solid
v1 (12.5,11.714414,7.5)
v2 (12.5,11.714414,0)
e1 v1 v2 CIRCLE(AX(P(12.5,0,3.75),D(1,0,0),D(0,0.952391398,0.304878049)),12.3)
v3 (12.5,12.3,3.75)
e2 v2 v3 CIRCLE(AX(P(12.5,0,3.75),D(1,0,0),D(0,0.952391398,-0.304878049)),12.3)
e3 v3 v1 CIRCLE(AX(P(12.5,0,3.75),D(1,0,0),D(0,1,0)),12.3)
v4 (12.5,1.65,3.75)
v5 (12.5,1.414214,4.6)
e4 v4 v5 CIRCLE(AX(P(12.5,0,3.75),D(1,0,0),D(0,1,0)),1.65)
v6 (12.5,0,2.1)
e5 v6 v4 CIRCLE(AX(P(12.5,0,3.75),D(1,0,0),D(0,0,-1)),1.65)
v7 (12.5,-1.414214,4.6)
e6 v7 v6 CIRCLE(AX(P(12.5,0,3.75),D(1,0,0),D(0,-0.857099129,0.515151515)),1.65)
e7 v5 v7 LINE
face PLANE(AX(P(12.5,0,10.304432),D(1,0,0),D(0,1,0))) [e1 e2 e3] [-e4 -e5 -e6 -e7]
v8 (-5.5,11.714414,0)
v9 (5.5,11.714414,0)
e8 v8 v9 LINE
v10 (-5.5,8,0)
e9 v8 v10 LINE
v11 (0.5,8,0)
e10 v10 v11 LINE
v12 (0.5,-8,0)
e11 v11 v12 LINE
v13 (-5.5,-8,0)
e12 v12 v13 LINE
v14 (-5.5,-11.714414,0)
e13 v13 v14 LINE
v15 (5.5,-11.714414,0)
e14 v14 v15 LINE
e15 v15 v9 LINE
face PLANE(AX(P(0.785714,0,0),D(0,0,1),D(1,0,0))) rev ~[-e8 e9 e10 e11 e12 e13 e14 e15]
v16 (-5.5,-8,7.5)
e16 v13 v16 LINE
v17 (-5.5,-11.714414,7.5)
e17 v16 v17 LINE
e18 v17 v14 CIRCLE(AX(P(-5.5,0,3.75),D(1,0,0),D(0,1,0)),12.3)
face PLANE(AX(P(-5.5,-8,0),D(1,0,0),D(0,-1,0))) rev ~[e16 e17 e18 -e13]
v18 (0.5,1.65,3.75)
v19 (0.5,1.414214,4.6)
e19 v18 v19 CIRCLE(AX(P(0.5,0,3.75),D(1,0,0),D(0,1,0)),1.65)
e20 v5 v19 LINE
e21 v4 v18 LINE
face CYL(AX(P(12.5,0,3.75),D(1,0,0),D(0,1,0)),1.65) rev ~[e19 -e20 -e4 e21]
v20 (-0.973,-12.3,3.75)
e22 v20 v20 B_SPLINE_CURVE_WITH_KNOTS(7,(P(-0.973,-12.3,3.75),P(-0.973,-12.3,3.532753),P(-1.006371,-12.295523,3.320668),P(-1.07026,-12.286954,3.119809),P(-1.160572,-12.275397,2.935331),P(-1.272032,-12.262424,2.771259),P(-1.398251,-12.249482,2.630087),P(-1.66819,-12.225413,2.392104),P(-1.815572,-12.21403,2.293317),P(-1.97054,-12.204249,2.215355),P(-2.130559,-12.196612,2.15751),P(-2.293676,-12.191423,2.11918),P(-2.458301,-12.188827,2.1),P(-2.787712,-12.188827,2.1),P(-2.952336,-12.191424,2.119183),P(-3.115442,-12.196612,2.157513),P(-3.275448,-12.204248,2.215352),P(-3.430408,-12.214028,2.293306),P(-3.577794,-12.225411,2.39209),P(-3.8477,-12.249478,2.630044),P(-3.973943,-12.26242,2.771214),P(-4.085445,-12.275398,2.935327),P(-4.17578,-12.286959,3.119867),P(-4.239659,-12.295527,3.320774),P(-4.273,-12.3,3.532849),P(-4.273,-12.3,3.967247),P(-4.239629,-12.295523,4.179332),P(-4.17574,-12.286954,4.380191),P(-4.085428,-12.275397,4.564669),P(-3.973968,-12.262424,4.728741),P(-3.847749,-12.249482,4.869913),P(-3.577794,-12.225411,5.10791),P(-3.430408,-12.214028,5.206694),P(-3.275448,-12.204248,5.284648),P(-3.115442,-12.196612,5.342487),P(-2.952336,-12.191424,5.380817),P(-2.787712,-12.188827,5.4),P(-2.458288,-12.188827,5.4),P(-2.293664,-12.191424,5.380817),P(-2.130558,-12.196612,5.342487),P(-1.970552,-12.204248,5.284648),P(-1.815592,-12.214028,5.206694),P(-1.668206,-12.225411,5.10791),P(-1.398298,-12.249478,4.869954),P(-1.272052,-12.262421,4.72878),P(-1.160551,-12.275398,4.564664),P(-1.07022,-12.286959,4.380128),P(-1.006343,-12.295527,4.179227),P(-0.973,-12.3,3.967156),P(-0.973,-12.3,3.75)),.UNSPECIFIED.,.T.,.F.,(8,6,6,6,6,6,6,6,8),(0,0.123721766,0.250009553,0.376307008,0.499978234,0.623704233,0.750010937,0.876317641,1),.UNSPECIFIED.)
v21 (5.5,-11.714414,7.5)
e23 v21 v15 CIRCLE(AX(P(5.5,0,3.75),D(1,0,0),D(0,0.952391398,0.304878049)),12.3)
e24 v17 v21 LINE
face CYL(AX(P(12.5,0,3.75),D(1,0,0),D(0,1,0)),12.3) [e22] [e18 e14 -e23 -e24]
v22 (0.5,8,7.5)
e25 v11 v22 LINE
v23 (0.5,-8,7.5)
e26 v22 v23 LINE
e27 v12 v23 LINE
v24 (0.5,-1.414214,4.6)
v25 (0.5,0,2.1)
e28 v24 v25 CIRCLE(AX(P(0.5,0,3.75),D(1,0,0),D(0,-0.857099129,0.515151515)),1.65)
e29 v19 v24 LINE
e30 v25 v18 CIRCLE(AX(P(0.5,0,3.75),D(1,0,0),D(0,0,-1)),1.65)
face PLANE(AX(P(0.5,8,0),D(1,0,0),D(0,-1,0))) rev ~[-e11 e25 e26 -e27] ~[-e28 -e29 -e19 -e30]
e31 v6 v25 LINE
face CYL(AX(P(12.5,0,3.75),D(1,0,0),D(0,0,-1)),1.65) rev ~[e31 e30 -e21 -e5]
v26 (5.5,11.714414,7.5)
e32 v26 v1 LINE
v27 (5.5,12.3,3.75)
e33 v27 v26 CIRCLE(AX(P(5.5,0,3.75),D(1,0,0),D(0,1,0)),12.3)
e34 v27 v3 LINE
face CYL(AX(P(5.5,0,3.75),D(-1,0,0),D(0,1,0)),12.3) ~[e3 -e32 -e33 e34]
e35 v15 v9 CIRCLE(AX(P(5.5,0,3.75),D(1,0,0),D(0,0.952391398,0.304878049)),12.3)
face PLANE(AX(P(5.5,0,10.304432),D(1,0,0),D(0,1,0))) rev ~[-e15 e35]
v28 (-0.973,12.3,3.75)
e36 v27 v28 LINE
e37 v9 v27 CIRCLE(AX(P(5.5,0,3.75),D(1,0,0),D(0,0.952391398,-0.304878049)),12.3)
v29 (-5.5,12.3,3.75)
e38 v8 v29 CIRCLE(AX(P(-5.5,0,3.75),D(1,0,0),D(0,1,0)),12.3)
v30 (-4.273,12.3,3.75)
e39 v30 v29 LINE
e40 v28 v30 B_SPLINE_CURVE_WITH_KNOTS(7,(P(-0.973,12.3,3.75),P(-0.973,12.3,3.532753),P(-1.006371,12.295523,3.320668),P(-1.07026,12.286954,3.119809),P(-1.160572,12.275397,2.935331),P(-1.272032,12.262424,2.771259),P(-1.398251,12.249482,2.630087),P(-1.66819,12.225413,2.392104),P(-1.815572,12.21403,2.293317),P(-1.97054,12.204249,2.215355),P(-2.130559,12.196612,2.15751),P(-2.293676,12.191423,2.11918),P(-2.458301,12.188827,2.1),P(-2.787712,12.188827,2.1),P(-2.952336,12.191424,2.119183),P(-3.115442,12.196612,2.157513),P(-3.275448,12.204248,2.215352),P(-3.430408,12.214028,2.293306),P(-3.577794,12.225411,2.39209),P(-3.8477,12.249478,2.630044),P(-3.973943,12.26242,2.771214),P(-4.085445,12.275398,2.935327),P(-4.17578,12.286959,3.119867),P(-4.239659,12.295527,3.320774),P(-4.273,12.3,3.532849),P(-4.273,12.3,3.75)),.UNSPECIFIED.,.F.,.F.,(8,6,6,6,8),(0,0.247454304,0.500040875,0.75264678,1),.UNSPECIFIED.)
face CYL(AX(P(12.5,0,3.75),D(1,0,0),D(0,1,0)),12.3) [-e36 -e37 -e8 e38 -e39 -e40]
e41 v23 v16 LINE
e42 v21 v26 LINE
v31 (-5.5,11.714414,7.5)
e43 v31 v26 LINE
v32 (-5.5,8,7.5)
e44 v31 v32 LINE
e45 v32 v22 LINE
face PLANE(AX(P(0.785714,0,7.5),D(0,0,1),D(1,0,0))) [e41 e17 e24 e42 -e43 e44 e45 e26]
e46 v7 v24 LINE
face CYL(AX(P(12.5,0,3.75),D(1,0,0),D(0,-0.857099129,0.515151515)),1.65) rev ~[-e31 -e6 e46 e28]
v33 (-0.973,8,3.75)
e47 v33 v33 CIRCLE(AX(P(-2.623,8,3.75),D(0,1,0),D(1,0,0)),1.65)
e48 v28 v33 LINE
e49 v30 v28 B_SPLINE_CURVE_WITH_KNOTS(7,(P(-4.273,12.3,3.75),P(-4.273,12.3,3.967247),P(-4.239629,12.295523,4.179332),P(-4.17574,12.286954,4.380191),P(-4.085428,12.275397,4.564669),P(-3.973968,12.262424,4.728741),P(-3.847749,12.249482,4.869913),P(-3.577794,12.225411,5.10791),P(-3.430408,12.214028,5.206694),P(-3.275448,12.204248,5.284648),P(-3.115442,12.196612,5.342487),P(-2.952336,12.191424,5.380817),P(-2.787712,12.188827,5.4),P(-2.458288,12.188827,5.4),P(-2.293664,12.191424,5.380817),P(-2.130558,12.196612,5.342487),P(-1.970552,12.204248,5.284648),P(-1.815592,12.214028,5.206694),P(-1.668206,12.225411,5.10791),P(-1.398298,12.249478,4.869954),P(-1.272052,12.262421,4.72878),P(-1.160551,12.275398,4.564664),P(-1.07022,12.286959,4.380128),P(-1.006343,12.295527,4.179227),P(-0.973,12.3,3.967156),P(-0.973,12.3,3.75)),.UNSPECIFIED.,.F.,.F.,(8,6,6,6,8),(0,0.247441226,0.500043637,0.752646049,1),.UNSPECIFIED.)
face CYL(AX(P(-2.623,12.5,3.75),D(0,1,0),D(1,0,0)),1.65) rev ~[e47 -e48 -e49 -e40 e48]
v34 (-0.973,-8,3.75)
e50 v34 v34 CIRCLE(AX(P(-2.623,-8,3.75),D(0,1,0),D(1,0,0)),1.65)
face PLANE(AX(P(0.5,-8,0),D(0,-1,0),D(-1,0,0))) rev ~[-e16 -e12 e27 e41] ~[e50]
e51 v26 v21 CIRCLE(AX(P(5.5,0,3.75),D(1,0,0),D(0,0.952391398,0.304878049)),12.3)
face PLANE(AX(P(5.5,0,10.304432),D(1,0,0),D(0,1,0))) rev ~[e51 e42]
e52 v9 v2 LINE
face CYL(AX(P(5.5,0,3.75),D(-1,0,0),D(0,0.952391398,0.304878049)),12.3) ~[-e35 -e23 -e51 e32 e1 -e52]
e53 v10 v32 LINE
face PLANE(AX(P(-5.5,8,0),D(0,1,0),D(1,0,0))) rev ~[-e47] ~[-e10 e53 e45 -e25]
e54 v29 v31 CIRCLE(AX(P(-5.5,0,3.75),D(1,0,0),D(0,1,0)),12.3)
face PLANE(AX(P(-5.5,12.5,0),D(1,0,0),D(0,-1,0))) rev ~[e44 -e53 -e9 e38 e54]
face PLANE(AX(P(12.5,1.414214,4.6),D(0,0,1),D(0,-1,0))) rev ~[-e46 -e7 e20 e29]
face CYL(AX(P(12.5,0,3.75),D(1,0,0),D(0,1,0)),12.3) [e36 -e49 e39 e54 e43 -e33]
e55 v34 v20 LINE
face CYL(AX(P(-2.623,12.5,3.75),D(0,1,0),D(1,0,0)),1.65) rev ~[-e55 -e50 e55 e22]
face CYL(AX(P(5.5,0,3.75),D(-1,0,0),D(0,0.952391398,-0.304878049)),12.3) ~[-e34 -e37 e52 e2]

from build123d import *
from build123d import SkipClean  # not in build123d's __all__

# Parameters (mm, degrees)
F1_DEPTH = 7.5
F3_DEPTH = 25.001
F5_DEPTH = 7
F7_DEPTH = 25
F8_R     = 14.6869623893
F8_R_2   = 12.3
F9_DEPTH = 25


with BuildPart() as f1:
    # F0 (on Top) → F1 (new body)
    with BuildSketch(Plane.XY):
        Polygon((5.5, -12.5), (5.5, 12.5), (-5.5, 12.5), (-5.5, 8), (0.5, 8), (0.5, -8), (-5.5, -8), (-5.5, -12.5), align=None)
    extrude(amount=F1_DEPTH)

    # F2 (on face) → F3 (cut, through all)
    with BuildSketch(Plane(origin=(0, 12.5, 0), x_dir=(-1, 0, 0), z_dir=(0, 1, 0))):
        with BuildLine():
            ThreePointArc((4.273, 3.75), (2.623, 5.4), (0.973, 3.75))
            Line((0.973, 3.75), (4.273, 3.75))
        make_face()
        with BuildLine():
            Line((4.273, 3.75), (0.973, 3.75))
            ThreePointArc((0.973, 3.75), (2.623, 2.1), (4.273, 3.75))
        make_face()
    extrude(amount=-F3_DEPTH, mode=Mode.SUBTRACT)

    # F4 (on face) → F5 (join)
    with BuildSketch(Plane.YZ.offset(5.5)):
        with BuildLine():
            Line((-11.7144141979, 7.5), (0, 7.5))
            Line((0, 7.5), (11.7144141979, 7.5))
            ThreePointArc((11.7144141979, 7.5), (0, 16.05), (-11.7144141979, 7.5))
        make_face()
        with BuildLine():
            Line((0, 0), (0, 7.5))
            Line((0, 7.5), (-11.7144141979, 7.5))
            ThreePointArc((-11.7144141979, 7.5), (-12.3, 3.75), (-11.7144141979, 0))
            Line((-11.7144141979, 0), (0, 0))
        make_face()
        with BuildLine():
            Line((11.7144141979, 0), (0, 0))
            Line((0, 0), (-11.7144141979, 0))
            ThreePointArc((-11.7144141979, 0), (0, -8.55), (11.7144141979, 0))
        make_face()
        with BuildLine():
            Line((11.7144141979, 7.5), (0, 7.5))
            Line((0, 7.5), (0, 0))
            Line((0, 0), (11.7144141979, 0))
            ThreePointArc((11.7144141979, 0), (12.1527218069, 1.8522769741), (12.3, 3.75))
            ThreePointArc((12.3, 3.75), (12.1527218069, 5.6477230259), (11.7144141979, 7.5))
        make_face()
    extrude(amount=F5_DEPTH)

    # F6 (on face) → F7 (cut)
    with BuildSketch(Plane.YZ.offset(12.5)):
        with BuildLine():
            Line((0, 2.1), (0, 4.6))
            Line((0, 4.6), (-1.4142135624, 4.6))
            ThreePointArc((-1.4142135624, 4.6), (-1.4361406616, 2.9375961595), (0, 2.1))
        make_face()
        with BuildLine():
            Line((1.4142135624, 4.6), (0, 4.6))
            Line((0, 4.6), (0, 2.1))
            ThreePointArc((0, 2.1), (1.166726189, 2.583273811), (1.65, 3.75))
            ThreePointArc((1.65, 3.75), (1.5899610652, 4.1910485359), (1.4142135624, 4.6))
        make_face()
    extrude(amount=-F7_DEPTH, mode=Mode.SUBTRACT)

    # F8 (on face) → F9 (cut)
    with BuildSketch(Plane.YZ.offset(12.5)):
        with Locations((0, 3.75)):
            Circle(F8_R)
        with Locations((0, 3.75)):
            Circle(F8_R_2, mode=Mode.SUBTRACT)
    with SkipClean():  # cleaning this boolean's faces spoils the solid; the shape is the same uncleaned
        extrude(amount=-F9_DEPTH, mode=Mode.SUBTRACT)


solid = f1.part
